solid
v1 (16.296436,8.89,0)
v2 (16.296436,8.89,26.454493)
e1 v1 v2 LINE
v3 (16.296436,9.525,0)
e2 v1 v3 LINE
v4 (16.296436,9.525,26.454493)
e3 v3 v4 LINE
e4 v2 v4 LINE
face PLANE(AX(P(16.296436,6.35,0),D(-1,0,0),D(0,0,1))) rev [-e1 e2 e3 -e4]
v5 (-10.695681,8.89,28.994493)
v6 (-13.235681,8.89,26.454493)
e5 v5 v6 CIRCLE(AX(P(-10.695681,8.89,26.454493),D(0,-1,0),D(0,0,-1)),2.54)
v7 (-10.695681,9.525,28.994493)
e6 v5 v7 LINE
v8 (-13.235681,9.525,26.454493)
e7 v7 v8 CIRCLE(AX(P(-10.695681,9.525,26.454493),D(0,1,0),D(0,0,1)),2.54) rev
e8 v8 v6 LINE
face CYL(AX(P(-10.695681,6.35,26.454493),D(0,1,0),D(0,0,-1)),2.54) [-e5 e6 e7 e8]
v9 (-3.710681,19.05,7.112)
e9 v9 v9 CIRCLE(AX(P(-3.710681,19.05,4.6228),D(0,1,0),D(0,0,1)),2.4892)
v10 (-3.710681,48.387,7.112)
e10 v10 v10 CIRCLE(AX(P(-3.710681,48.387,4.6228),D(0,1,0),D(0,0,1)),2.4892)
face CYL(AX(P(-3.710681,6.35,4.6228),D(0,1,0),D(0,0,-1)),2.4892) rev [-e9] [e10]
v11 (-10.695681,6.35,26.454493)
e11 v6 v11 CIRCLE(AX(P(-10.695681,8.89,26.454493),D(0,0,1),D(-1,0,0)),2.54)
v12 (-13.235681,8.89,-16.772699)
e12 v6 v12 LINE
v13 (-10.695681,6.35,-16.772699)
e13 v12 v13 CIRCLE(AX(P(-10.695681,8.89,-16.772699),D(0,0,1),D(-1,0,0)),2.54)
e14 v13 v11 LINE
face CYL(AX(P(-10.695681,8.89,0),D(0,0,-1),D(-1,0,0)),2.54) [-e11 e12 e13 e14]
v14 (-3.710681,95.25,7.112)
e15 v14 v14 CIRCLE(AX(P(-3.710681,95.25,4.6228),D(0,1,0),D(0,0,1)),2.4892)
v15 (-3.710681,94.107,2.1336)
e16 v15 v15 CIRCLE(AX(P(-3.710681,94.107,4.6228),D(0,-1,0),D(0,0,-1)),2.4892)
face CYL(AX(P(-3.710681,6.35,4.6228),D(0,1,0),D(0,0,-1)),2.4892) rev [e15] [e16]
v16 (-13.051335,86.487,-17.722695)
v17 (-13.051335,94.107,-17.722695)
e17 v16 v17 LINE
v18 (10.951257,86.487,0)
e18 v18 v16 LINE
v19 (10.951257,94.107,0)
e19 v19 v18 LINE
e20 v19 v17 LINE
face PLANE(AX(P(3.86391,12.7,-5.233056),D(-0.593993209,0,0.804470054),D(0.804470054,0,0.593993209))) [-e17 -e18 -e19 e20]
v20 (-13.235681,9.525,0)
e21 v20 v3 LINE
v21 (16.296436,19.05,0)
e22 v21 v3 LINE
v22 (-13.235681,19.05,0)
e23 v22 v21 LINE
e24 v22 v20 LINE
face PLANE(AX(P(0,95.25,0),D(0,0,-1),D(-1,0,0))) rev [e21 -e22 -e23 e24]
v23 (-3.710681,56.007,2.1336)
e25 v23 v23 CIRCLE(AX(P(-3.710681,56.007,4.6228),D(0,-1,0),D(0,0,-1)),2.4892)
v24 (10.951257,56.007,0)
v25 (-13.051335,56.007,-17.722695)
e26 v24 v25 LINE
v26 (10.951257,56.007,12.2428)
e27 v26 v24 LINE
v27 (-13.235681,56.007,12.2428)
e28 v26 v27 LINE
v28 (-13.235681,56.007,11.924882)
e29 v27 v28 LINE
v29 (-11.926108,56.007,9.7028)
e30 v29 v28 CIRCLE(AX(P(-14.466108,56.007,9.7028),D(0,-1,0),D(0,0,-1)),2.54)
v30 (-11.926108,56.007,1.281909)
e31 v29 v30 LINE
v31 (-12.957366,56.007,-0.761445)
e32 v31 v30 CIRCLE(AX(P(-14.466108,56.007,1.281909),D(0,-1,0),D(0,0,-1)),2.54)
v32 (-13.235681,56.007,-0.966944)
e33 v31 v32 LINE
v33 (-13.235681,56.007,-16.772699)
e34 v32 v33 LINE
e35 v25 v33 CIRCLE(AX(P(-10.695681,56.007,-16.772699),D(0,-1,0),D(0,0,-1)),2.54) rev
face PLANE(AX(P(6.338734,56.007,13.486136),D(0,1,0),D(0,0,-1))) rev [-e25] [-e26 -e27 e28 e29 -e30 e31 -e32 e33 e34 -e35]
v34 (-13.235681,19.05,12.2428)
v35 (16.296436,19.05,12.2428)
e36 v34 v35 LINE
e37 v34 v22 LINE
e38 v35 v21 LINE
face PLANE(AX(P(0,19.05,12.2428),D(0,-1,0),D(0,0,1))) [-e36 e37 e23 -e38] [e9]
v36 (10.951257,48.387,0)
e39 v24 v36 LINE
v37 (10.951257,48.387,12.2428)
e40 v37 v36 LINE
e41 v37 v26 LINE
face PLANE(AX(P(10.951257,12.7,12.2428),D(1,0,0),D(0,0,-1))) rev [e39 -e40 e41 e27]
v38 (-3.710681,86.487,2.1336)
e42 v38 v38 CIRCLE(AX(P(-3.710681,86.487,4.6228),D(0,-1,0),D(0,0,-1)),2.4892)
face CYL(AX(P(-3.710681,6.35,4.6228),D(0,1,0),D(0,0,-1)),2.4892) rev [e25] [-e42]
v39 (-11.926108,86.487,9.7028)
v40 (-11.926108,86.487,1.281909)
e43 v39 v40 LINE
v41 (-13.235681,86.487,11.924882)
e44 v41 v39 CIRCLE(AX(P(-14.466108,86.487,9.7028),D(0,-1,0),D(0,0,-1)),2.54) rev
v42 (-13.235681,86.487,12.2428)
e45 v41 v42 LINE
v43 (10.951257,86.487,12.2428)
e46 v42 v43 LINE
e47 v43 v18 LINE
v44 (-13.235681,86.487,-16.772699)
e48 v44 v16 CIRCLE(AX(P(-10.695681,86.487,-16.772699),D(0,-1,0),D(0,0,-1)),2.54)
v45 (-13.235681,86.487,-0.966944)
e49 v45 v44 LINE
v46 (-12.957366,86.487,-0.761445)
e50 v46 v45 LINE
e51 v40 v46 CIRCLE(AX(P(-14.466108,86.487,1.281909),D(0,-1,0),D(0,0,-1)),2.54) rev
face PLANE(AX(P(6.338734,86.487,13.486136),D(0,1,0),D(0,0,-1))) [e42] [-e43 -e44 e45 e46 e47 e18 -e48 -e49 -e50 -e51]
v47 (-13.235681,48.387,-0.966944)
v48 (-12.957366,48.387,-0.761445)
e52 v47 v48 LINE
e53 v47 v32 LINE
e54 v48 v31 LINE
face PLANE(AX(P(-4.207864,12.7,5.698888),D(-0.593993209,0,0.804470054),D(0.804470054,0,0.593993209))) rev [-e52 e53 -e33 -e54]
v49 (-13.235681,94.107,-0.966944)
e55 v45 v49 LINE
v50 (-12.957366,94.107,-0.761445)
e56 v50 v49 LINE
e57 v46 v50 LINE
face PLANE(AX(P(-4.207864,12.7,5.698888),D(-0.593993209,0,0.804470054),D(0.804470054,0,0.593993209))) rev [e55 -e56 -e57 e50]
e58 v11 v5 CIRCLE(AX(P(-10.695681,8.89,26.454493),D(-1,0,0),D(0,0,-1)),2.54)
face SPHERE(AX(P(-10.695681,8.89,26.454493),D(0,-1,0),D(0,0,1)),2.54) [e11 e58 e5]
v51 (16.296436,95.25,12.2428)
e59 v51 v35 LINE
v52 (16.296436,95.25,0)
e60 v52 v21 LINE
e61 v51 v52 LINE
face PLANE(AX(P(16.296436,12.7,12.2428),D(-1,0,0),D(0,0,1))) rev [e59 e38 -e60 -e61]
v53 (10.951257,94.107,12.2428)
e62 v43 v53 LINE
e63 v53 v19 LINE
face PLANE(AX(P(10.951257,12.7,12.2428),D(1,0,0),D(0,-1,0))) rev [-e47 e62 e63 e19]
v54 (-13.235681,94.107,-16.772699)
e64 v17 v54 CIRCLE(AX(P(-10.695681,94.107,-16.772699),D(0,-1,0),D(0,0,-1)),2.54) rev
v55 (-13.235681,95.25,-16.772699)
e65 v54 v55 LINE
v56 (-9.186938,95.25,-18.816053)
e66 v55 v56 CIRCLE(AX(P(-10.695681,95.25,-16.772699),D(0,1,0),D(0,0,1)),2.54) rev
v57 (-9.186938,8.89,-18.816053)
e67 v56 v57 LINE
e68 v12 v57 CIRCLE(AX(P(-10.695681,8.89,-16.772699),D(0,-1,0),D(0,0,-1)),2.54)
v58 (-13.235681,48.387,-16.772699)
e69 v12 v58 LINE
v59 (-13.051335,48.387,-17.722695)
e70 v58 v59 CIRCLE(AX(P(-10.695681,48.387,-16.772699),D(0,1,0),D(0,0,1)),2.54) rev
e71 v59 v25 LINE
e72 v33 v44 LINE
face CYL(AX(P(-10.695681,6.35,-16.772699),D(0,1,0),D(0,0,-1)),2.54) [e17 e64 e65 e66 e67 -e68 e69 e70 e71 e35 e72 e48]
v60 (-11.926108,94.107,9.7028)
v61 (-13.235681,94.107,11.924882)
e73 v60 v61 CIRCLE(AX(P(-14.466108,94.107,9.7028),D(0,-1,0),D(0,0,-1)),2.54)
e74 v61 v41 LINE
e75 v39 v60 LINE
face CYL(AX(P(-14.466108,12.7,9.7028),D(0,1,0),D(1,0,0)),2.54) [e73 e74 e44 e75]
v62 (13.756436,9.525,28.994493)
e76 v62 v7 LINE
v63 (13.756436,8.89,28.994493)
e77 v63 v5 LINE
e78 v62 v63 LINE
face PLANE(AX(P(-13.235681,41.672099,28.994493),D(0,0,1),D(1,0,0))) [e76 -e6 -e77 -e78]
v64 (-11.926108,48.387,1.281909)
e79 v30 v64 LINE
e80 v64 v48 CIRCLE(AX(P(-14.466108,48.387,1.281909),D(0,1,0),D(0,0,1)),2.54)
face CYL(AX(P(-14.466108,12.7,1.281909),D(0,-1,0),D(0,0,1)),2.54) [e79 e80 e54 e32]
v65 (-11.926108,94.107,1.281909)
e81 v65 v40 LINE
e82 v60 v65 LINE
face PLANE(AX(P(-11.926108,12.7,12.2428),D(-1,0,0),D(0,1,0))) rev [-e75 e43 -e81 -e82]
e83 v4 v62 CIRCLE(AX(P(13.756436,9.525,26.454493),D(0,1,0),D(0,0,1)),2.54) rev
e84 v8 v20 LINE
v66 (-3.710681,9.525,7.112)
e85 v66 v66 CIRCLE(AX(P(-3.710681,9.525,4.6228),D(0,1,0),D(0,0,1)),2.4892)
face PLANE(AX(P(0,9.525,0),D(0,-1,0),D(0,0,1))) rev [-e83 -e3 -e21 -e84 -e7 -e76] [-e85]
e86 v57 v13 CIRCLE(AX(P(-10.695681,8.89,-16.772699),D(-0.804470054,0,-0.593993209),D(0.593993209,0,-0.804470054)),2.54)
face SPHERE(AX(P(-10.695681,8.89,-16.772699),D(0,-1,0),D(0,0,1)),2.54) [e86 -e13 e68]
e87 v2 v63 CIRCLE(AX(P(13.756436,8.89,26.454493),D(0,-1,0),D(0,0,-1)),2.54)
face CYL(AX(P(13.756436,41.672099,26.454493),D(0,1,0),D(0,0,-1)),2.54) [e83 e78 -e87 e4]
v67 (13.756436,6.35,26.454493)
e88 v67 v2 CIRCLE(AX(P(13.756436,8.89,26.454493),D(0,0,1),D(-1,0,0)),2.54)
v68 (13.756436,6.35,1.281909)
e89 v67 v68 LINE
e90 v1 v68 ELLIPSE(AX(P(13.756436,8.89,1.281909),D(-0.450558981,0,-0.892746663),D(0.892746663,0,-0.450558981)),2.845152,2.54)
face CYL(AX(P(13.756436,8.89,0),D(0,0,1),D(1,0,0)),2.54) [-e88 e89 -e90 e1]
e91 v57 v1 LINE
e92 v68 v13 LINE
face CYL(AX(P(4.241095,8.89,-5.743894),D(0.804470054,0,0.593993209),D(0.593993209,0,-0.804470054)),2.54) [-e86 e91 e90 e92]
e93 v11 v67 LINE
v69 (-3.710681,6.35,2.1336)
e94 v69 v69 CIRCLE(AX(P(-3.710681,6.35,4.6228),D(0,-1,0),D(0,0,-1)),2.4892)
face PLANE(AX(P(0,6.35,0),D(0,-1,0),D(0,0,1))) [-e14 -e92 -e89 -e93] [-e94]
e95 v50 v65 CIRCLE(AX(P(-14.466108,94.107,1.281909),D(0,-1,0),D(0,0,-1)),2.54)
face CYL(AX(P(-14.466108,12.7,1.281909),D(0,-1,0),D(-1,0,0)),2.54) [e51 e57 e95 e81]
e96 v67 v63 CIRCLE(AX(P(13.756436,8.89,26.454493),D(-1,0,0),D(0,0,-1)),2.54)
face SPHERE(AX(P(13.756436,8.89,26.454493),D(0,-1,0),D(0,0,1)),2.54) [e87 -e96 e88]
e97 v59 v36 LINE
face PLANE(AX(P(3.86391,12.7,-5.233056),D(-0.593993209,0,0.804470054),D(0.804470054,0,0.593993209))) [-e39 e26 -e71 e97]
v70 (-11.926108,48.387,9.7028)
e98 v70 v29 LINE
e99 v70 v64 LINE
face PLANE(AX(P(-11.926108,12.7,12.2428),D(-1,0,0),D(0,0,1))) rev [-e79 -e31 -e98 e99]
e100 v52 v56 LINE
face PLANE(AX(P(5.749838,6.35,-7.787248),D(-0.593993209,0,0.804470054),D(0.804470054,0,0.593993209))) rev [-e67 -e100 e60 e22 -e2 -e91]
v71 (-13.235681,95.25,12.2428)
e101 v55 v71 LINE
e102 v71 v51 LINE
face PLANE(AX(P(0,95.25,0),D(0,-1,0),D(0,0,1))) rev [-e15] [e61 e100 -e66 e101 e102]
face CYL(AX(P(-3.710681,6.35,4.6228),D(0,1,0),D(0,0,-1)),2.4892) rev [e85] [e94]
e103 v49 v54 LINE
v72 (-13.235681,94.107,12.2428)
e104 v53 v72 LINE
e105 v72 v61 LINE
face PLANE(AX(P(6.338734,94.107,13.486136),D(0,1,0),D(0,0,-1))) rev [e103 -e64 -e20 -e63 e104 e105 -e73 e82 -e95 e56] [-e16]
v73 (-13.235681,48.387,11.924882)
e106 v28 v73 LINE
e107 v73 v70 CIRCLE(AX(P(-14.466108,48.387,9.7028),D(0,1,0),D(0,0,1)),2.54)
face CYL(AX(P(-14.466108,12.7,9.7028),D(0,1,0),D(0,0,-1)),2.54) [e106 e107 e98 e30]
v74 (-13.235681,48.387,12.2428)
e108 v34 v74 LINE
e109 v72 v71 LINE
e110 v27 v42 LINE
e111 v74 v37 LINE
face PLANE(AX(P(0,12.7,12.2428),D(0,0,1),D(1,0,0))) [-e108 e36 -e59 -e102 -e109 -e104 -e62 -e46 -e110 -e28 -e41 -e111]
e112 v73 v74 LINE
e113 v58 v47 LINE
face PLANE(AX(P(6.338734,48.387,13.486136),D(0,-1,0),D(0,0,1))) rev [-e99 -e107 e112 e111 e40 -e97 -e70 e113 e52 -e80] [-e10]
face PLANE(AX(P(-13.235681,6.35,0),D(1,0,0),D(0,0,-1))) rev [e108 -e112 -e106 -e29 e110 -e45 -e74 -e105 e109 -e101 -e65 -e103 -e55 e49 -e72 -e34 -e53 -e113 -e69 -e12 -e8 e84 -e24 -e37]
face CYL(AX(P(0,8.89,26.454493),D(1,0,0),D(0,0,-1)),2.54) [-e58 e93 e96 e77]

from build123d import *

# Parameters (mm, degrees)
SKETCH1_W               = 29.532117275
SKETCH1_H               = 16.294493356
BOSS_EXTRUDE1_DEPTH     = 6.35
BOSS_EXTRUDE2_DEPTH     = 82.55
SKETCH2_W               = 29.532117275
SKETCH2_H               = 16.294493356
CUT_EXTRUDE1_DEPTH      = 3.175
SKETCH4_W               = 29.532117275
SKETCH4_H               = 12.7
BOSS_EXTRUDE3_DEPTH     = 3.175
SKETCH7_W               = 36.710026843
SKETCH7_H               = 7.62
CUT_EXTRUDE4_DEPTH      = 13.589
SKETCH8_W               = 36.710026843
SKETCH8_H               = 7.62
CUT_EXTRUDE5_DEPTH      = 13.589
SKETCH9_W               = 29.532117275
SKETCH9_H               = 76.2
SKETCH9_W_2             = 22.877365929
SKETCH9_H_2             = 7.62
BOSS_EXTRUDE5_DEPTH     = 12.2428
CUT_EXTRUDE6_DEPTH      = 95.918198917
CUT_EXTRUDE6_DEPTH_BACK = 95.918198917
SKETCH10_R              = 2.4892
FILLET2_R               = 2.54
FILLET3_R               = 2.54


with BuildPart() as part:
    # Sketch1 → Boss-Extrude1 (new body)
    with BuildSketch(Plane(origin=(0, 0, 0), x_dir=(1, 0, 0), z_dir=(0, 1, 0))):
        Polygon((16.296436439, 0), (-13.235680836, 21.805506644), (-13.235680836, 0), align=None)
        with Locations((1.530377802, -8.147246678)):
            Rectangle(SKETCH1_W, SKETCH1_H)
    extrude(amount=BOSS_EXTRUDE1_DEPTH)

    # Sketch1<3> → Boss-Extrude2 (add)
    with BuildSketch(Plane(origin=(0, 0, 0), x_dir=(1, 0, 0), z_dir=(0, 1, 0))):
        Polygon((16.296436439, 0), (-13.235680836, 21.805506644), (-13.235680836, 0), align=None)
    extrude(amount=-BOSS_EXTRUDE2_DEPTH)

    # Sketch2 → Cut-Extrude1 (cut)
    with BuildSketch(Plane(origin=(0, 0, 0), x_dir=(-1, 0, 0), z_dir=(0, -1, 0))):
        with Locations((-1.530377802, -8.147246678)):
            Rectangle(SKETCH2_W, SKETCH2_H)
    extrude(amount=-CUT_EXTRUDE1_DEPTH, mode=Mode.SUBTRACT)

    # Sketch4 → Boss-Extrude3 (add)
    with BuildSketch(Plane(origin=(0, 6.35, 0), x_dir=(1, 0, 0), z_dir=(0, 1, 0))):
        with Locations((1.530377802, -22.644493356)):
            Rectangle(SKETCH4_W, SKETCH4_H)
    extrude(amount=-BOSS_EXTRUDE3_DEPTH)

    # Sketch7 → Cut-Extrude4 (cut)
    with BuildSketch(Plane(origin=(3.863909533, 0, -5.233055638), x_dir=(-0.804470053980136, 0, -0.5939932089251503), z_dir=(0.5939932089251503, 0, -0.804470053980136))):
        with Locations((5.24501832, -77.597)):
            Rectangle(SKETCH7_W, SKETCH7_H)
    extrude(amount=-CUT_EXTRUDE4_DEPTH, mode=Mode.SUBTRACT)

    # Sketch8 → Cut-Extrude5 (cut)
    with BuildSketch(Plane(origin=(3.863909533, 0, -5.233055638), x_dir=(-0.804470053980136, 0, -0.5939932089251503), z_dir=(0.5939932089251503, 0, -0.804470053980136))):
        with Locations((5.24501832, -39.497)):
            Rectangle(SKETCH8_W, SKETCH8_H)
    extrude(amount=-CUT_EXTRUDE5_DEPTH, mode=Mode.SUBTRACT)

    # Sketch9 → Boss-Extrude5 (add)
    with BuildSketch(Plane.XY):
        with Locations((1.530377802, -44.45)):
            Rectangle(SKETCH9_W, SKETCH9_H)
        with Locations((-0.487425481, -77.597)):
            Rectangle(SKETCH9_W_2, SKETCH9_H_2, mode=Mode.SUBTRACT)
        with Locations((-0.487425481, -39.497)):
            Rectangle(SKETCH9_W_2, SKETCH9_H_2, mode=Mode.SUBTRACT)
    extrude(amount=BOSS_EXTRUDE5_DEPTH)

    # Sketch10 → Cut-Extrude6 (cut, two sides: drawn at the far end of the back side and taken through both)
    with BuildSketch(Plane(origin=(0, -82.55, 0), x_dir=(-1, 0, 0), z_dir=(0, -1, 0)).offset(-CUT_EXTRUDE6_DEPTH_BACK)):
        with Locations(Location((3.710680836, -4.6228, 0), (0, 0, 270))):
            Circle(SKETCH10_R)
    extrude(amount=CUT_EXTRUDE6_DEPTH + CUT_EXTRUDE6_DEPTH_BACK, mode=Mode.SUBTRACT)

    # Fillet2
    # the kernel refuses this fillet: 2.54 mm, written as the material it takes off along each edge
    with BuildSketch(Plane(origin=(-13.235680836, -95.13201822, -21.805506644), x_dir=(0.8044700539801357, 0, 0.5939932089251506), z_dir=(0, 1, 0))) as fillet2_piece_1:
        with BuildLine():
            CenterArc((FILLET2_R * 1.98142019214, -FILLET2_R), FILLET2_R, 90, 126.440893479)
            Line((FILLET2_R * 1.17695013816, -FILLET2_R * 1.59399320893), (0, 0))
            Line((0, 0), (FILLET2_R * 1.98142019214, 0))
        make_face()
    extrude(amount=114.06403644, mode=Mode.SUBTRACT)
    with BuildSketch(Plane(origin=(-11.926108446, -81.407, 0), x_dir=(-0.8044700539801358, 0, -0.5939932089251506), z_dir=(0, 1, 0))) as fillet2_piece_2:
        with BuildLine():
            CenterArc((FILLET2_R * 0.504688507753, FILLET2_R), FILLET2_R, 216.440893479, 53.559106521)
            Line((-FILLET2_R * 0.299781546228, FILLET2_R * 0.406006791075), (0, 0))
            Line((0, 0), (FILLET2_R * 0.504688507753, 0))
        make_face()
    extrude(amount=7.62, mode=Mode.SUBTRACT)
    with BuildSketch(Plane(origin=(-11.926108446, -81.407, 12.2428), x_dir=(-1, 0, 0), z_dir=(0, 1, 0)), Plane(origin=(-11.926108446, -43.307, 12.2428), x_dir=(-1, 0, 0), z_dir=(0, 1, 0))) as fillet2_piece_3:
        with BuildLine():
            CenterArc((FILLET2_R, -FILLET2_R), FILLET2_R, 90, 90)
            Line((0, -FILLET2_R), (0, 0))
            Line((0, 0), (FILLET2_R, 0))
        make_face()
    extrude(amount=7.62, mode=Mode.SUBTRACT)
    with BuildSketch(Plane(origin=(-11.926108446, -35.687, 0), x_dir=(-0.8044700539801356, 0, -0.5939932089251507), z_dir=(0, -1, 0))) as fillet2_piece_4:
        with BuildLine():
            CenterArc((FILLET2_R * 0.504688507753, -FILLET2_R), FILLET2_R, 90, 53.559106521)
            Line((-FILLET2_R * 0.299781546228, -FILLET2_R * 0.406006791075), (0, 0))
            Line((0, 0), (FILLET2_R * 0.504688507753, 0))
        make_face()
    extrude(amount=7.62, mode=Mode.SUBTRACT)
    with BuildSketch(Plane(origin=(-13.235680836, 12.7, 28.994493356), x_dir=(0, 0, -1), z_dir=(0, -1, 0))) as fillet2_piece_5:
        with BuildLine():
            CenterArc((FILLET2_R, FILLET2_R), FILLET2_R, 180, 90)
            Line((0, FILLET2_R), (0, 0))
            Line((0, 0), (FILLET2_R, 0))
        make_face()
    extrude(amount=15.875, mode=Mode.SUBTRACT)
    with BuildSketch(Plane(origin=(16.296436439, 12.7, 28.994493356), x_dir=(0, 0, -1), z_dir=(0, -1, 0))) as fillet2_piece_6:
        with BuildLine():
            CenterArc((FILLET2_R, -FILLET2_R), FILLET2_R, 90, 90)
            Line((0, -FILLET2_R), (0, 0))
            Line((0, 0), (FILLET2_R, 0))
        make_face()
    extrude(amount=15.875, mode=Mode.SUBTRACT)

    # Fillet3
    fillet3_edges = [part.edges().sort_by_distance(p)[0] for p in [
        (-13.235680836, 6.35, 4.840897),
        (1.530377801, 6.35, 28.994493356),
        (16.296436439, 6.35, 13.227246678),
        (15.552487663, 6.35, 28.25054458),
        (-12.491732061, 6.35, 28.25054458),
        (-11.840100649, 6.35, -19.04027588),
        (3.554749177, 6.35, -9.408026646),
    ]]
    fillet(fillet3_edges, radius=FILLET3_R)


with BuildPart() as body_2:
    # Mirror1: mirrored copy
    add(part.part.mirror(Plane.ZX.offset(6.35)))


solid = body_2.part
